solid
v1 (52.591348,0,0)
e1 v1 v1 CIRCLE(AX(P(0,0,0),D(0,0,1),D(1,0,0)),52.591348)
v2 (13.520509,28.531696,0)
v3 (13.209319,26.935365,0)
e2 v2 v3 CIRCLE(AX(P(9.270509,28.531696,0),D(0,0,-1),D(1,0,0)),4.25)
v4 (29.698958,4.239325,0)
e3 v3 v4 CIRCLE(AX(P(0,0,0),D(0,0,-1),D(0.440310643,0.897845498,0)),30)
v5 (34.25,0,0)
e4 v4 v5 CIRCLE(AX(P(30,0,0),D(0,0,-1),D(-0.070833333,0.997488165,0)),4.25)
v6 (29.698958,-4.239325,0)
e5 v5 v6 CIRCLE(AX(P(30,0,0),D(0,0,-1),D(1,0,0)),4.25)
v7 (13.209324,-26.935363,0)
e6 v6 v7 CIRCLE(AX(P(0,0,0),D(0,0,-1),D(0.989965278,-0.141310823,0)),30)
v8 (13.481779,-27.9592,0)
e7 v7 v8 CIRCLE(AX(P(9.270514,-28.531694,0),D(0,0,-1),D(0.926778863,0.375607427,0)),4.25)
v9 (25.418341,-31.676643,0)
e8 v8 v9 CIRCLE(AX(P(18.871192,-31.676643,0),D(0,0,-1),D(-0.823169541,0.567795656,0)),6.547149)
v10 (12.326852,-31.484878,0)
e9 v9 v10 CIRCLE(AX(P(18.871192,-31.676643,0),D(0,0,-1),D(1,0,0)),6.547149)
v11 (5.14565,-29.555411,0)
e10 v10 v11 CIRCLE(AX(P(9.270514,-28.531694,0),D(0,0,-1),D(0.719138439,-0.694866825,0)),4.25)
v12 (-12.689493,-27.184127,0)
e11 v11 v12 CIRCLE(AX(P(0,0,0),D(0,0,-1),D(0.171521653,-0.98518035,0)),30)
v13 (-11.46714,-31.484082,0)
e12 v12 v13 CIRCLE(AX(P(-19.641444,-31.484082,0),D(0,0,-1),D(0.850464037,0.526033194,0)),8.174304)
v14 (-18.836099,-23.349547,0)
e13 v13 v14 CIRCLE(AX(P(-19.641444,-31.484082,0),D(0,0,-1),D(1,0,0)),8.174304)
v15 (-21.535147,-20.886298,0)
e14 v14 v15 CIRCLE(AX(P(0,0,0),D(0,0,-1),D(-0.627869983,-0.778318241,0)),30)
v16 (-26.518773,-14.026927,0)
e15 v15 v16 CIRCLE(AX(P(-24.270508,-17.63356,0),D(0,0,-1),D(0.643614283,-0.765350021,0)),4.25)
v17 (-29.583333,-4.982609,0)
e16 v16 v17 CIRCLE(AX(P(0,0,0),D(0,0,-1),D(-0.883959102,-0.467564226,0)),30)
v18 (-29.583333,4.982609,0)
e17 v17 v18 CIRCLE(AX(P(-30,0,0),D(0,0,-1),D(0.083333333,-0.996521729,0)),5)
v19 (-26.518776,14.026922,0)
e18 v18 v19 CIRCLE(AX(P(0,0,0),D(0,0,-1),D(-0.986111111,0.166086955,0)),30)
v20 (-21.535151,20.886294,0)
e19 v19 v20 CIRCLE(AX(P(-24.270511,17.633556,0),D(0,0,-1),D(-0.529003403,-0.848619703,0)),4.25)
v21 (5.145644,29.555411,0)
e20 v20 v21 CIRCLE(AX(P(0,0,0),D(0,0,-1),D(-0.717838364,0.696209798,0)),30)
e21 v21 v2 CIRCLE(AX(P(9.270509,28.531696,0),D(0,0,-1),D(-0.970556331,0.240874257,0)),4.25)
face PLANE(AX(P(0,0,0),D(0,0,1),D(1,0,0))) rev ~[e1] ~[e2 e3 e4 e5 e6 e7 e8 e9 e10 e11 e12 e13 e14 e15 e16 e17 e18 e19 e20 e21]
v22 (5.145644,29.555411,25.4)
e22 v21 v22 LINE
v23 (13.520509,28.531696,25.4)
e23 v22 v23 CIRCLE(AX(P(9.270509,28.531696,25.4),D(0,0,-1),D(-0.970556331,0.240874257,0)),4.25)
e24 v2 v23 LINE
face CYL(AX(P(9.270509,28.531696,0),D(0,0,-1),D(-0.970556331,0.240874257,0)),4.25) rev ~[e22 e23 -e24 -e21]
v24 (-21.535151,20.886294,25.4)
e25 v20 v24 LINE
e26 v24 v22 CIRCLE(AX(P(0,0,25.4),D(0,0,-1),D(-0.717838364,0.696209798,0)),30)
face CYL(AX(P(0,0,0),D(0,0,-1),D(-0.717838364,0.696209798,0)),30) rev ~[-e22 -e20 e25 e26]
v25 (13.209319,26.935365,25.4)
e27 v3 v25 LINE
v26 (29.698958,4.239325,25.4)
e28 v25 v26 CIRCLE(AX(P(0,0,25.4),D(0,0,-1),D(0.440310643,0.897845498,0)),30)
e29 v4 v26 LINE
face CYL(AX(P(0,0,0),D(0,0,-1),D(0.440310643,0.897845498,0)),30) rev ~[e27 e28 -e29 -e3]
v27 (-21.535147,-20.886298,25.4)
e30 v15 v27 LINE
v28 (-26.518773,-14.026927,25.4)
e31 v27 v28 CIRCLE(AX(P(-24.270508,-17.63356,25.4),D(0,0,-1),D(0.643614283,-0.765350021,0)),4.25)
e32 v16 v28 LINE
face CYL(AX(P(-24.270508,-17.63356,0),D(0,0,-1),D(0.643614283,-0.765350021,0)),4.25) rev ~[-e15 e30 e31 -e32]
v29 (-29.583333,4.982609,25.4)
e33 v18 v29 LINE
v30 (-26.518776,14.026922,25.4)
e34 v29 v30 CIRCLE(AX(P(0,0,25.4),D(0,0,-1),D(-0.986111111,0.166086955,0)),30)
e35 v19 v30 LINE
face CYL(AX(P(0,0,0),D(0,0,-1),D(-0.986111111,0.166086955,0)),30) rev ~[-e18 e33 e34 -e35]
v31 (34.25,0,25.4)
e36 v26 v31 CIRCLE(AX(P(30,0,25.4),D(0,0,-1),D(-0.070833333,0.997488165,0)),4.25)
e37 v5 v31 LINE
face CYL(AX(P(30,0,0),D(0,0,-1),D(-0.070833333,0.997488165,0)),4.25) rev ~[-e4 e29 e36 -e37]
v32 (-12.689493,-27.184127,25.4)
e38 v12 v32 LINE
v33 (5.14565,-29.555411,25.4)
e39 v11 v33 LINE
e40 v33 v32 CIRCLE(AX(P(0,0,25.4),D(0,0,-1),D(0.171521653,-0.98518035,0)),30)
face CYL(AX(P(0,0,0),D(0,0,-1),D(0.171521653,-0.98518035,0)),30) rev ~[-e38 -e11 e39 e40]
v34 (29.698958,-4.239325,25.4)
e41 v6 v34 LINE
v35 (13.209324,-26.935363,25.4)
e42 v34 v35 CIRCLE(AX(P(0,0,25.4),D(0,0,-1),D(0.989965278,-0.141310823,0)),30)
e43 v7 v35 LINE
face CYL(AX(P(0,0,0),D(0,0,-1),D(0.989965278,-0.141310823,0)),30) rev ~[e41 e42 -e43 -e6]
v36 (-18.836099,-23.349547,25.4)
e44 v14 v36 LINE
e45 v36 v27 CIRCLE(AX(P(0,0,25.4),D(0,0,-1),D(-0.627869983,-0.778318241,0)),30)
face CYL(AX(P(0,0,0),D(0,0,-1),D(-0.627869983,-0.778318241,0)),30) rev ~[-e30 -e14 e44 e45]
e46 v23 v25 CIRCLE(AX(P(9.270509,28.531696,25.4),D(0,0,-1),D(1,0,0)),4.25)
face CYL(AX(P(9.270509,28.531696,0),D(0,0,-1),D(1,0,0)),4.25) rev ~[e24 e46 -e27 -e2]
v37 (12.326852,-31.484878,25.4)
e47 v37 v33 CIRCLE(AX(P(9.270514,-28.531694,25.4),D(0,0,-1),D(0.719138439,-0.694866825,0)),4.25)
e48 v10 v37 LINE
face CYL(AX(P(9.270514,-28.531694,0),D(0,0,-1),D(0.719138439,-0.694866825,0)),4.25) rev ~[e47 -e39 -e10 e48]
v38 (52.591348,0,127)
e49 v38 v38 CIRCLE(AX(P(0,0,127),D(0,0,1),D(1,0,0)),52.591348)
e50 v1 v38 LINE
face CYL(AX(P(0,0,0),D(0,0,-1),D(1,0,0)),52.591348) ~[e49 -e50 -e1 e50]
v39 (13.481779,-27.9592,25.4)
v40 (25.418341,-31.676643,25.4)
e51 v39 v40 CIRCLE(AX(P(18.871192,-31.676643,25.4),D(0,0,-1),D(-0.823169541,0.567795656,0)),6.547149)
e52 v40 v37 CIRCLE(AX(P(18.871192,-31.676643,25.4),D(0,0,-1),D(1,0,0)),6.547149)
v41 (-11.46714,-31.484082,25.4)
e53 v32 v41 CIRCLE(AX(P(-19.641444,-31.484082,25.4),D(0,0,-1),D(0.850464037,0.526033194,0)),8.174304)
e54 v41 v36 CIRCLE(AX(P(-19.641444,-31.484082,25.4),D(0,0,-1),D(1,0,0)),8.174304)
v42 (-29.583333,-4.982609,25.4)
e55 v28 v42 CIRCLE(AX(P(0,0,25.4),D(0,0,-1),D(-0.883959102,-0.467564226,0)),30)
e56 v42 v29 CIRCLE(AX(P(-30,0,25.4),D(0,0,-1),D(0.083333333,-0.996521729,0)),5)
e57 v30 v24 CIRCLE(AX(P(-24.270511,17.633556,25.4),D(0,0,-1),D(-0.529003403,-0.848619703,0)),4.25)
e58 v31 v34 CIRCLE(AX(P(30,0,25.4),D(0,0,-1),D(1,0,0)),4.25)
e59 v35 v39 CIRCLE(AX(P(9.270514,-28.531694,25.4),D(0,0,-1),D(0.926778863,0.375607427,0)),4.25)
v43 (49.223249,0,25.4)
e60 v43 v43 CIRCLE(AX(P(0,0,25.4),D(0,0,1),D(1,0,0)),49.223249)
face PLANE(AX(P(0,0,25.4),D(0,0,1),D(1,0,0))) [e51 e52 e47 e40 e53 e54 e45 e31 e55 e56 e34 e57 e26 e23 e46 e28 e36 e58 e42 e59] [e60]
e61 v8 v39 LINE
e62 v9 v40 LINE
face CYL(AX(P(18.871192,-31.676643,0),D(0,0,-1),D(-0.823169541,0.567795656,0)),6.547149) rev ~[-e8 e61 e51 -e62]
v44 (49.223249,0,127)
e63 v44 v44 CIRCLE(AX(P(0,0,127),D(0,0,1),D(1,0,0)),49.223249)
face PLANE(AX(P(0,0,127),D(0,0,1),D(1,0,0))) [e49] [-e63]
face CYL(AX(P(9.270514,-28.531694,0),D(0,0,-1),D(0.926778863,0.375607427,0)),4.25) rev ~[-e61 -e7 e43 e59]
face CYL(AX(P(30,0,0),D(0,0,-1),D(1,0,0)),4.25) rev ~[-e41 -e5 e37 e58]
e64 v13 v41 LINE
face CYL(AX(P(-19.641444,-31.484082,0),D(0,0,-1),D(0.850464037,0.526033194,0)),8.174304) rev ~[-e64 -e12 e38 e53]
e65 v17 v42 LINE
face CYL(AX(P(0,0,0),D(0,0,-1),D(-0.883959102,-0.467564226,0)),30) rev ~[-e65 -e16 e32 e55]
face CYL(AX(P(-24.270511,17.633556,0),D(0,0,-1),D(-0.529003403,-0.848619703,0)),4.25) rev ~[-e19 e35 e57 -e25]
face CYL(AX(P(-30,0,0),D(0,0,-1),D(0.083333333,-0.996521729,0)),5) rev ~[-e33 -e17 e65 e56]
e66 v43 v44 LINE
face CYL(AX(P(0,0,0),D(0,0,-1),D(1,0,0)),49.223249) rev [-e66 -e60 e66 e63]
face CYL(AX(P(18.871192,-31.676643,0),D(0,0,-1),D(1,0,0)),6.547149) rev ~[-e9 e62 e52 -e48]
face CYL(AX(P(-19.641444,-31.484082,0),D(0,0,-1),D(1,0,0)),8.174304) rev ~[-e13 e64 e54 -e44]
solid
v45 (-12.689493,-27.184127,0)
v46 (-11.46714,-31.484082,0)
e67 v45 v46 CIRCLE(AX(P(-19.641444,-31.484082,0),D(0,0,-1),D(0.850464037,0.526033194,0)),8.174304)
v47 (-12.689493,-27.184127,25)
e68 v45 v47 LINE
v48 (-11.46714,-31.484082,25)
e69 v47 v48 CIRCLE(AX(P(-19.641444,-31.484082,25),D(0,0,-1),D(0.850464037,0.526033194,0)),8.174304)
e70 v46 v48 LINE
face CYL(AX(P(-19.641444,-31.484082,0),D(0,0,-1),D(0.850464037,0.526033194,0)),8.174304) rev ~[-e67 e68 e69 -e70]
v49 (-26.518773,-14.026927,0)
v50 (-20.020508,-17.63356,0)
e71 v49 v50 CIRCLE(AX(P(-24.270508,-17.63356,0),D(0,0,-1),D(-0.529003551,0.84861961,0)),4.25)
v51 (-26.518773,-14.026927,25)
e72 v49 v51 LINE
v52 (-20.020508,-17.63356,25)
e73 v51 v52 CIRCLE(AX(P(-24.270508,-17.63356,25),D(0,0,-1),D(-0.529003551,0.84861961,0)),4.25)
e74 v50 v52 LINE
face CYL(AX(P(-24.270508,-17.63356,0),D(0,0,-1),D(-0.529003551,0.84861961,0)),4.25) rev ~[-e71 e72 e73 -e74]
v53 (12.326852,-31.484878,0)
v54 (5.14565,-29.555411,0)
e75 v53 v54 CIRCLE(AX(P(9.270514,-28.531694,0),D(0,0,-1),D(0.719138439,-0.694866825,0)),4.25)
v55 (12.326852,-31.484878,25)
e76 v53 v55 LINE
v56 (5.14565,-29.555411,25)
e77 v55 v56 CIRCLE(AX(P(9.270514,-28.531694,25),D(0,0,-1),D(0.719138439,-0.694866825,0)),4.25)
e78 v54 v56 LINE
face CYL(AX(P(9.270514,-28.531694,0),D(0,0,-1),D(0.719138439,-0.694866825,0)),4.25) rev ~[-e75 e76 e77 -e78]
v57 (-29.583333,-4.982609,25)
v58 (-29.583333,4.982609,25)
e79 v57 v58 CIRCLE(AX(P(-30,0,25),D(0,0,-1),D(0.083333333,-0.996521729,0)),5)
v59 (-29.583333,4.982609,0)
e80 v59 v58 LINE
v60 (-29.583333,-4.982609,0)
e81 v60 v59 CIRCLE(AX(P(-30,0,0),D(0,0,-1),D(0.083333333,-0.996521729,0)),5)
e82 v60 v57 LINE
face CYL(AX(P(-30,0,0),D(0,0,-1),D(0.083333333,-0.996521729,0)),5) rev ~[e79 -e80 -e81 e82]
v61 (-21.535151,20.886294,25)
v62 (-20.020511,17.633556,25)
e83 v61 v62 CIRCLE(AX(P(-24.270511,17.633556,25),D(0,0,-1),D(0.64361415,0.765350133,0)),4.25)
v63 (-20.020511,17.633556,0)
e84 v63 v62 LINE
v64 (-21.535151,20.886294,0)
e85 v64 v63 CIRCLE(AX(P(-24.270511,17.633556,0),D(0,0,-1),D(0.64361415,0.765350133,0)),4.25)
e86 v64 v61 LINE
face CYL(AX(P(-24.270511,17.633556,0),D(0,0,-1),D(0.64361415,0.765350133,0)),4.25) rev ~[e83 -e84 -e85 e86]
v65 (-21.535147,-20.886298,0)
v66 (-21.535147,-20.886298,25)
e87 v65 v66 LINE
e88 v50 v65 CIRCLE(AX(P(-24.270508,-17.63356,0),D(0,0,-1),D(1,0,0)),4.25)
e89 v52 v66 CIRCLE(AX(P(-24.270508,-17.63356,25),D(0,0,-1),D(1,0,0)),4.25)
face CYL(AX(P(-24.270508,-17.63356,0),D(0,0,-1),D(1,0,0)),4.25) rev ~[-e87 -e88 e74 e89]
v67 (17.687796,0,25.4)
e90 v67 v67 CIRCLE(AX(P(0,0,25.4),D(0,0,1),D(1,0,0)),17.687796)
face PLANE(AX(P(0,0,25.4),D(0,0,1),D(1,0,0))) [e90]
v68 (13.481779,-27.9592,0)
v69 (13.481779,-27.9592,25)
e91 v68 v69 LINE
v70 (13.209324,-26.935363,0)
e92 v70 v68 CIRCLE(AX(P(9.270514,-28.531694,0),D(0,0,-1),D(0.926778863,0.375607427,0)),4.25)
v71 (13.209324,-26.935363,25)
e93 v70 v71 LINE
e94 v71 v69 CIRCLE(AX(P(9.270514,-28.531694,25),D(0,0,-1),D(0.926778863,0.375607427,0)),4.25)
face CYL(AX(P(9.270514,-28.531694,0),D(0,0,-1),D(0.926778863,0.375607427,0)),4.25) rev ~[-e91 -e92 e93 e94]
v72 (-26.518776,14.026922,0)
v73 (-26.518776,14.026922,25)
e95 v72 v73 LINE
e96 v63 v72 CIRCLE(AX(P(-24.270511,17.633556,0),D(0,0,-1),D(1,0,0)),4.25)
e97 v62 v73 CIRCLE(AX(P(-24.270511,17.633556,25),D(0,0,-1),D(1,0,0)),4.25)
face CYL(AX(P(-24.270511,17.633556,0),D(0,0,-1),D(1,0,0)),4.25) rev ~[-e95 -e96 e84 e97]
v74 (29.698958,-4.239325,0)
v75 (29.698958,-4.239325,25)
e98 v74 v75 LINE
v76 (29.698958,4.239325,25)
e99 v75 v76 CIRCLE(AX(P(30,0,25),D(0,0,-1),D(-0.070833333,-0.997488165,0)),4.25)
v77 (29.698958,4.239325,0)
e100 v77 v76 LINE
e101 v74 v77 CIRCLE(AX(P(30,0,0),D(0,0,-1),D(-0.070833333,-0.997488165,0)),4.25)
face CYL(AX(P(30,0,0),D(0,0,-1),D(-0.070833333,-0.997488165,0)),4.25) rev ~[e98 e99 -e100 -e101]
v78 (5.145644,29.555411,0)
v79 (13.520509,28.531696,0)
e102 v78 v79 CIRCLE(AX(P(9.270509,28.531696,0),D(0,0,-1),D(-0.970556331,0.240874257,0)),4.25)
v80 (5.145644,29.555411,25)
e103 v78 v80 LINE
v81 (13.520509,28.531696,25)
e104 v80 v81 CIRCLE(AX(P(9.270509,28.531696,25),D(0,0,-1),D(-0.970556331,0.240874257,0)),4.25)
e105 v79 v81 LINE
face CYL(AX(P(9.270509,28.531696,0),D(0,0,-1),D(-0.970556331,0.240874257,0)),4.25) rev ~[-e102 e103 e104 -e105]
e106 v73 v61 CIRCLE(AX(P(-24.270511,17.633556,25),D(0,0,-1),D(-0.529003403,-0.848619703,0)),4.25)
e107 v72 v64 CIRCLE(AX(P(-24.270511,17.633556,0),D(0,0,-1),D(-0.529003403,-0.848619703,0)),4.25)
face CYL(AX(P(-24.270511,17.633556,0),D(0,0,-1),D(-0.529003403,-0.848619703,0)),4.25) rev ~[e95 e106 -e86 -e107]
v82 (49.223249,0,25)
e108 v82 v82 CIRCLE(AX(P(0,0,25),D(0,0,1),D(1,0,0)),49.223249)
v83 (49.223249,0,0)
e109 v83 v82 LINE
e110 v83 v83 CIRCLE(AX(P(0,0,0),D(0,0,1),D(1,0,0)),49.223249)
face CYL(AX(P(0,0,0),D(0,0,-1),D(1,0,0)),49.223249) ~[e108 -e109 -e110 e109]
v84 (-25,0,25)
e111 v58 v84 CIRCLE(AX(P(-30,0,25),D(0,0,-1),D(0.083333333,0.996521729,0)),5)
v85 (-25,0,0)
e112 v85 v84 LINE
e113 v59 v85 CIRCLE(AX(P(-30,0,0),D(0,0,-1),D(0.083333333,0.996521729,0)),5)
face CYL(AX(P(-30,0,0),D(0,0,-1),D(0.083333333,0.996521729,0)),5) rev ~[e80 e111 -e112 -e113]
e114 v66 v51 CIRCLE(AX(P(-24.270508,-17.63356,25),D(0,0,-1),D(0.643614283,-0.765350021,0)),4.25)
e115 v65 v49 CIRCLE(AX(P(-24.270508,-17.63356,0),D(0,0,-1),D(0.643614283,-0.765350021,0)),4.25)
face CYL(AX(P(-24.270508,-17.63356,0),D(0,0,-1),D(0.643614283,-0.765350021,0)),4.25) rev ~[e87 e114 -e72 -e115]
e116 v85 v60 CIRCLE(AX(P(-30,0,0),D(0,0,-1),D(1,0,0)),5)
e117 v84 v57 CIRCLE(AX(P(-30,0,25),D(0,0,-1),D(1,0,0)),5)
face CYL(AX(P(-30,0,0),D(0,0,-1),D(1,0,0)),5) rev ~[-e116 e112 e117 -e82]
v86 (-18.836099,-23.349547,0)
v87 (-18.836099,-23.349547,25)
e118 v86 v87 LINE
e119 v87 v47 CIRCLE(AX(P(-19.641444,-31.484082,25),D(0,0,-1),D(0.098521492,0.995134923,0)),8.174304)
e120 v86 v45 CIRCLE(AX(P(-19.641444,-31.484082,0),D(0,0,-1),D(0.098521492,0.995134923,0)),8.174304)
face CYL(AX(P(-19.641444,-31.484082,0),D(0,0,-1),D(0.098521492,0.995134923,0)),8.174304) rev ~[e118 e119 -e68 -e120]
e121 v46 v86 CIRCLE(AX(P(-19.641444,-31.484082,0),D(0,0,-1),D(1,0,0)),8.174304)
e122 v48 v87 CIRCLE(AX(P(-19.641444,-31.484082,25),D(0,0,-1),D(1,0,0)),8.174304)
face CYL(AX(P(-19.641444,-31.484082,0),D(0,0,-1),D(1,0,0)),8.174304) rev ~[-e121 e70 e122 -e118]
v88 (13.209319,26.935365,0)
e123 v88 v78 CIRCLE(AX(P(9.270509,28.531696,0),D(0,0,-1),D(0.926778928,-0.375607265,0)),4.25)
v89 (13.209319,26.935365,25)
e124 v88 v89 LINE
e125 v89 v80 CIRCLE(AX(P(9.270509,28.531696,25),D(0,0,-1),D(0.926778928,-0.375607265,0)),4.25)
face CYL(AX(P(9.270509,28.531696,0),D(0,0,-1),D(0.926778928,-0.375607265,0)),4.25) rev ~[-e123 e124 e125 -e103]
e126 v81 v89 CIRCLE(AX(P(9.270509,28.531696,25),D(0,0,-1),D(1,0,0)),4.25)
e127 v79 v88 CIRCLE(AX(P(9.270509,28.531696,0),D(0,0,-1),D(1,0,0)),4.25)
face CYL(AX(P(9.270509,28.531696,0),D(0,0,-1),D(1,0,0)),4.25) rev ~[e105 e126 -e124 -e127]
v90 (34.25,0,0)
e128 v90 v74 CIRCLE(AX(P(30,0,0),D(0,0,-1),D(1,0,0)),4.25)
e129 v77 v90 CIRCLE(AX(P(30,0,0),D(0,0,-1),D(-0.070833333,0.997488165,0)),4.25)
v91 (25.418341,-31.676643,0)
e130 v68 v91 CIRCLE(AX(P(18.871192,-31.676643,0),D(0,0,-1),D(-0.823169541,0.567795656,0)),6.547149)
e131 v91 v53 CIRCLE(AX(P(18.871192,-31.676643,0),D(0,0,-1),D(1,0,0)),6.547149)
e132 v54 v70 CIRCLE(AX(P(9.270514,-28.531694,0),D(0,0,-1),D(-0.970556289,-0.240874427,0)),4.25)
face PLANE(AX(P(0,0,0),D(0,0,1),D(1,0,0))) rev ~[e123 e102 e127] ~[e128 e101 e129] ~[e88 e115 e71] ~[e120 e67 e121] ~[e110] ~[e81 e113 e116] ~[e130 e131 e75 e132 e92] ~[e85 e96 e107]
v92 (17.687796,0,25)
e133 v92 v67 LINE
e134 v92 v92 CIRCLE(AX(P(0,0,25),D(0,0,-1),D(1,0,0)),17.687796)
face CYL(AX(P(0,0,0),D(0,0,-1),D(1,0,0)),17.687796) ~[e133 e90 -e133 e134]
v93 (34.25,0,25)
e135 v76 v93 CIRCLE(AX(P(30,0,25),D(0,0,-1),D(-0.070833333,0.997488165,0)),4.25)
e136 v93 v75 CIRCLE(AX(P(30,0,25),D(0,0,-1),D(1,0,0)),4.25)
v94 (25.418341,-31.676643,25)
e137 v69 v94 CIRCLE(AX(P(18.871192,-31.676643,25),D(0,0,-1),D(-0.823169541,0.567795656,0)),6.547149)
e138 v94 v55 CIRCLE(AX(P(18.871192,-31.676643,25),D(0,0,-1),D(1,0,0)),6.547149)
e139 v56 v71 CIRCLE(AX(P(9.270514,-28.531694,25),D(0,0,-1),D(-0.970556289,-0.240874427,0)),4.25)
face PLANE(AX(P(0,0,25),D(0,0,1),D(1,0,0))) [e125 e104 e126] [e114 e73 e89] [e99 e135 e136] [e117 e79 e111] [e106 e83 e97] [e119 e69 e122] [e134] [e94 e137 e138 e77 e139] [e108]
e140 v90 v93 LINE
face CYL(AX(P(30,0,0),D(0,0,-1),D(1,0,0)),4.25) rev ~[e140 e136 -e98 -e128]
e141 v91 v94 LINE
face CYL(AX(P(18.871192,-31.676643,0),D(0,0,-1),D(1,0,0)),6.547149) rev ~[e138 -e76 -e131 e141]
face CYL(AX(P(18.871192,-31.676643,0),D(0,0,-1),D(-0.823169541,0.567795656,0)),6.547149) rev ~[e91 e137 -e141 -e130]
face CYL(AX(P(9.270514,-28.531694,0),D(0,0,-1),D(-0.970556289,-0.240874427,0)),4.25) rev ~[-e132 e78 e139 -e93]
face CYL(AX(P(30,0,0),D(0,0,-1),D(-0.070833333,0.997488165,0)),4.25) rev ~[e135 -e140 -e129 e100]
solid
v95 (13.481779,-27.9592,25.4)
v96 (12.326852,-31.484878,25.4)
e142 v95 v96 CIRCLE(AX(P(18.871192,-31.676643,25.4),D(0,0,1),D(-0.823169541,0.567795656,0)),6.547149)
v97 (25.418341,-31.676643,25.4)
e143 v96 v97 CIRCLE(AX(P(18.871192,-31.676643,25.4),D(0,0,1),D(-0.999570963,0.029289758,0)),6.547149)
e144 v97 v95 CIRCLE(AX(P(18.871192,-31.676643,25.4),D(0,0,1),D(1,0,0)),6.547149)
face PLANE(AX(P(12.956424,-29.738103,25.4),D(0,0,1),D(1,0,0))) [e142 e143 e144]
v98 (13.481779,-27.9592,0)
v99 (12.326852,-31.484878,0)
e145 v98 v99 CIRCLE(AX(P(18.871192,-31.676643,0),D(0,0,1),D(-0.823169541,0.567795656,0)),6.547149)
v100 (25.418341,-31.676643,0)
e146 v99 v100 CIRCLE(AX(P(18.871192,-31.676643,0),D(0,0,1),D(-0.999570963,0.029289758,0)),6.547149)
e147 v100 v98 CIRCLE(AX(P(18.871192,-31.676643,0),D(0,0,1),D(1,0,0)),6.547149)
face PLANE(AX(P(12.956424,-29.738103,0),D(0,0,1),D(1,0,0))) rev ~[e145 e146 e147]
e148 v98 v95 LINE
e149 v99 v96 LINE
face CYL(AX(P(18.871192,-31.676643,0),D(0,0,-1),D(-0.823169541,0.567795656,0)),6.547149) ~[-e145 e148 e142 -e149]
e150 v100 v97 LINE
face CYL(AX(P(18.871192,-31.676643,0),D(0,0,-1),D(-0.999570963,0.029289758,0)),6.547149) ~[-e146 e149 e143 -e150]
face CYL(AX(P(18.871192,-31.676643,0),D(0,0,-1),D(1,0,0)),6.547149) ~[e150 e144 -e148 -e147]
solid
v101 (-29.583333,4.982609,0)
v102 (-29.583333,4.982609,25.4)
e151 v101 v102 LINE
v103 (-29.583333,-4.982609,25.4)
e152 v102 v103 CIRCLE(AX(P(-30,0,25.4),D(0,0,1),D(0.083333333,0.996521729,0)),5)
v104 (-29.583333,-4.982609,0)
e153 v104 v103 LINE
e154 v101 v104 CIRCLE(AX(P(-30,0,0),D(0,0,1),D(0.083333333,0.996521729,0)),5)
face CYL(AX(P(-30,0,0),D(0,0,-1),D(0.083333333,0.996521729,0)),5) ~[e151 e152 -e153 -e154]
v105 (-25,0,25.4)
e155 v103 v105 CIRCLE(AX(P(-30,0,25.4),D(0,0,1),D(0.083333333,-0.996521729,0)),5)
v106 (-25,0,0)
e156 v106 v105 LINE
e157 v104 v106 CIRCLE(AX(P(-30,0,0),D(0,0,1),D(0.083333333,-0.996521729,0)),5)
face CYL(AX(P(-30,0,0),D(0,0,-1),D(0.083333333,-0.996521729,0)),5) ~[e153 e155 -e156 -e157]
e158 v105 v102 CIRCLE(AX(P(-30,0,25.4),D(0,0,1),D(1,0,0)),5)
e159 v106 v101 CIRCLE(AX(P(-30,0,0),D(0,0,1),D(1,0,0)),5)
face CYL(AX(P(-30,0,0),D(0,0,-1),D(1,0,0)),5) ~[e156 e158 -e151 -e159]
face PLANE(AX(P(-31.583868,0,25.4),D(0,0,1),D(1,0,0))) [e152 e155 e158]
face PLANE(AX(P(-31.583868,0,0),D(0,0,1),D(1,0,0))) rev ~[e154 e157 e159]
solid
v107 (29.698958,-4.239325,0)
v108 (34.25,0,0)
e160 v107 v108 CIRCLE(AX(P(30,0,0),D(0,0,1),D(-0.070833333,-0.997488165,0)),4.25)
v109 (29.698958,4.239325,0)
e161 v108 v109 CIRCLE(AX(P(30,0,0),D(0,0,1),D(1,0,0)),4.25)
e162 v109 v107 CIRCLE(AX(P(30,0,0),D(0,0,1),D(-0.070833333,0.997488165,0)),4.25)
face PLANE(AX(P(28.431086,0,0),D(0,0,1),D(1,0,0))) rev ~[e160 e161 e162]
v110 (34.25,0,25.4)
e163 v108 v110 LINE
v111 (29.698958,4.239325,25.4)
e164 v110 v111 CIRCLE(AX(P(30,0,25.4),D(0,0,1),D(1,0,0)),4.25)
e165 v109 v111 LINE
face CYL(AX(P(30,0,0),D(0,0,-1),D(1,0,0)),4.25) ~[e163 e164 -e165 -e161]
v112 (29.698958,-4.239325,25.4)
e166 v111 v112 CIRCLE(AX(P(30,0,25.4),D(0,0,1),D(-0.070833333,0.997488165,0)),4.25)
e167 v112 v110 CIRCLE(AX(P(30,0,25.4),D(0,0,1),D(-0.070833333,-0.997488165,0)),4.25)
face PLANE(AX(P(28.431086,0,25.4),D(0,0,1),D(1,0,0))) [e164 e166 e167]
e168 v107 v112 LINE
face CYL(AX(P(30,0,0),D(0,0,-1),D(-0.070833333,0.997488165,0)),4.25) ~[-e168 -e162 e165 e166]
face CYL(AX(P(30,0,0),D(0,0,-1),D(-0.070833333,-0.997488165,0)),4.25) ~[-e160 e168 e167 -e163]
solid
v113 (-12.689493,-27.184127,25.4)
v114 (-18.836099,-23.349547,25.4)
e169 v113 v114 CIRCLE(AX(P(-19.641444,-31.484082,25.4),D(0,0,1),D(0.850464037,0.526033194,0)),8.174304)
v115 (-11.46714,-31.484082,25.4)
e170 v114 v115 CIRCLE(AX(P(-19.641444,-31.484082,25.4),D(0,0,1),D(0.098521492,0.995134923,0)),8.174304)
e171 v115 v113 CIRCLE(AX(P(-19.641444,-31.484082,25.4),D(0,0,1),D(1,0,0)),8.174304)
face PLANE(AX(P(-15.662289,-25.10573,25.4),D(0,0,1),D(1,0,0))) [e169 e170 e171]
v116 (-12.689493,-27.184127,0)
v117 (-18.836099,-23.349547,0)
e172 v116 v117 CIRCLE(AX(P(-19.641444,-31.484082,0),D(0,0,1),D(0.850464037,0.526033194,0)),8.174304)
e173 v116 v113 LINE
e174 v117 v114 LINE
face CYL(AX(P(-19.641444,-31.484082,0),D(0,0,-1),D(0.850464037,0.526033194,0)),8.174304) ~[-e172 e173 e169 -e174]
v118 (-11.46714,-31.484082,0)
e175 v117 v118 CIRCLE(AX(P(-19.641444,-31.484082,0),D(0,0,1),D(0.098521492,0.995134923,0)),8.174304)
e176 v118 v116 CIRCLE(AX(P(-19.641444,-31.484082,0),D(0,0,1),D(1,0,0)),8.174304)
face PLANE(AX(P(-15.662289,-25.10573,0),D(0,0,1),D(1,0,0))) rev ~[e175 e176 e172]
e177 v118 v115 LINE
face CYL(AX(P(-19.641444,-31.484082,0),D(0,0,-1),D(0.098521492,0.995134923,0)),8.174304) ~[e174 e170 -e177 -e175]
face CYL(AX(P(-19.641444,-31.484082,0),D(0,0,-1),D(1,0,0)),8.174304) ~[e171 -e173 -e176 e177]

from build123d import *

# Parameters (mm, degrees)
F3_DEPTH = 25.4
F0_R     = 49.2232486947
F6_DEPTH = 25.4
F1_R     = 17.687795716
F0_R_2   = 52.5913484354
F7_DEPTH = 127
F9_DEPTH = 25


# Not quite as in the source:
# - a feature names something its author has since deleted; it is built from what else it names


with BuildPart() as f3:
    # F0 (on Top) → F3 (new body)
    with BuildSketch(Plane.XY):
        with BuildLine():
            ThreePointArc((-29.5833333333, -4.982608643), (-30, 0), (-29.5833333333, 4.982608643))
            ThreePointArc((-29.5833333333, 4.982608643), (-35, 0), (-29.5833333333, -4.982608643))
        make_face()
        with BuildLine():
            ThreePointArc((-25, 0), (-26.320099639, 3.3850160019), (-29.5833333333, 4.982608643))
            ThreePointArc((-29.5833333333, 4.982608643), (-30, 0), (-29.5833333333, -4.982608643))
            ThreePointArc((-29.5833333333, -4.982608643), (-26.320099639, -3.3850160019), (-25, 0))
        make_face()
    extrude(amount=F3_DEPTH)


with BuildPart() as f3b:
    # F0 (on Top) → F3, piece 2 (new body)
    with BuildSketch(Plane.XY):
        with BuildLine():
            ThreePointArc((-18.8360994911, -23.3495472325), (-15.8789717039, -25.4530598873), (-12.6894927419, -27.1841272428))
            ThreePointArc((-12.6894927419, -27.1841272428), (-15.3147928366, -24.5487142681), (-18.8360994911, -23.3495472325))
        make_face()
        with BuildLine():
            ThreePointArc((-11.4671403642, -31.4840823412), (-11.7786645812, -29.2489224373), (-12.6894927419, -27.1841272428))
            ThreePointArc((-12.6894927419, -27.1841272428), (-15.8789717039, -25.4530598873), (-18.8360994911, -23.3495472325))
            ThreePointArc((-18.8360994911, -23.3495472325), (-25.699594493, -36.9720742337), (-11.4671403642, -31.4840823412))
        make_face()
    extrude(amount=F3_DEPTH)


with BuildPart() as f3c:
    # F0 (on Top) → F3, piece 3 (new body)
    with BuildSketch(Plane.XY):
        with BuildLine():
            ThreePointArc((13.5205138222, -28.5316941921), (13.5108189409, -28.2447926413), (13.4817785281, -27.9592000205))
            ThreePointArc((13.4817785281, -27.9592000205), (12.6493579809, -29.63852128), (12.3268521898, -31.4848781997))
            ThreePointArc((12.3268521898, -31.4848781997), (13.2108144492, -30.1243432334), (13.5205138222, -28.5316941921))
        make_face()
        with BuildLine():
            ThreePointArc((25.4183405572, -31.6766425967), (20.8179668086, -25.4256248319), (13.4817785281, -27.9592000205))
            ThreePointArc((13.4817785281, -27.9592000205), (13.5108189409, -28.2447926413), (13.5205138222, -28.5316941921))
            ThreePointArc((13.5205138222, -28.5316941921), (13.2108144492, -30.1243432334), (12.3268521898, -31.4848781997))
            ThreePointArc((12.3268521898, -31.4848781997), (18.7752994046, -38.223088985), (25.4183405572, -31.6766425967))
        make_face()
    extrude(amount=F3_DEPTH)


with BuildPart() as f3d:
    # F0 (on Top) → F3, piece 4 (new body)
    with BuildSketch(Plane.XY):
        with BuildLine():
            ThreePointArc((30, 0), (29.9246449436, 2.125), (29.6989583333, 4.2393247003))
            ThreePointArc((29.6989583333, 4.2393247003), (25.75, 0), (29.6989583333, -4.2393247003))
            ThreePointArc((29.6989583333, -4.2393247003), (29.9246449436, -2.125), (30, 0))
        make_face()
        with BuildLine():
            ThreePointArc((29.6989583333, -4.2393247003), (32.8968148816, -3.1098172843), (34.25, 0))
            ThreePointArc((34.25, 0), (32.8968148816, 3.1098172843), (29.6989583333, 4.2393247003))
            ThreePointArc((29.6989583333, 4.2393247003), (29.9246449436, 2.125), (30, 0))
            ThreePointArc((30, 0), (29.9246449436, -2.125), (29.6989583333, -4.2393247003))
        make_face()
    extrude(amount=F3_DEPTH)


with BuildPart() as f6:
    # F0 (on Top) → F6 (new body)
    with BuildSketch(Plane.XY):
        Circle(F0_R)
        with BuildLine():
            ThreePointArc((29.6989583333, 4.2393247003), (32.8968148816, 3.1098172843), (34.25, 0))
            ThreePointArc((34.25, 0), (32.8968148816, -3.1098172843), (29.6989583333, -4.2393247003))
            ThreePointArc((29.6989583333, -4.2393247003), (24.2705110645, -17.6335558713), (13.2093239888, -26.9353626253))
            ThreePointArc((13.2093239888, -26.9353626253), (13.3775797895, -27.4387581739), (13.4817785281, -27.9592000205))
            ThreePointArc((13.4817785281, -27.9592000205), (20.8179668086, -25.4256248319), (25.4183405572, -31.6766425967))
            ThreePointArc((25.4183405572, -31.6766425967), (18.7752994046, -38.223088985), (12.3268521898, -31.4848781997))
            ThreePointArc((12.3268521898, -31.4848781997), (8.1677226938, -32.6361249355), (5.1456495934, -29.5554105074))
            ThreePointArc((5.1456495934, -29.5554105074), (-3.9538763818, -29.7383062994), (-12.6894927419, -27.1841272428))
            ThreePointArc((-12.6894927419, -27.1841272428), (-11.7786645812, -29.2489224373), (-11.4671403642, -31.4840823412))
            ThreePointArc((-11.4671403642, -31.4840823412), (-25.699594493, -36.9720742337), (-18.8360994911, -23.3495472325))
            ThreePointArc((-18.8360994911, -23.3495472325), (-20.2231622396, -22.1590547865), (-21.5351472772, -20.8862977032))
            ThreePointArc((-21.5351472772, -20.8862977032), (-27.7088299454, -20.1316477979), (-26.5187730739, -14.0269267715))
            ThreePointArc((-26.5187730739, -14.0269267715), (-28.4132277018, -9.6274862537), (-29.5833333333, -4.982608643))
            ThreePointArc((-29.5833333333, -4.982608643), (-35, 0), (-29.5833333333, 4.982608643))
            ThreePointArc((-29.5833333333, 4.982608643), (-28.4132285435, 9.6274837697), (-26.5187755265, 14.0269221349))
            ThreePointArc((-26.5187755265, 14.0269221349), (-27.7088334653, 20.1316429531), (-21.5351509291, 20.8862939379))
            ThreePointArc((-21.5351509291, 20.8862939379), (-9.2705113278, 28.5316950026), (5.1456444258, 29.5554114071))
            ThreePointArc((5.1456444258, 29.5554114071), (9.7861764915, 32.7502959205), (13.5205088335, 28.531695813))
            ThreePointArc((13.5205088335, 28.531695813), (13.4419860536, 27.7185059196), (13.2093192793, 26.9353649349))
            ThreePointArc((13.2093192793, 26.9353649349), (24.2705095229, 17.6335579931), (29.6989583333, 4.2393247003))
        make_face(mode=Mode.SUBTRACT)
    extrude(amount=F6_DEPTH)

    # F0 (on Top) → F7 (join)
    with BuildSketch(Plane.XY):
        Circle(F0_R_2)
        Circle(F0_R, mode=Mode.SUBTRACT)
    extrude(amount=F7_DEPTH)


with BuildPart() as f6b:
    # F1 (on Top) → F6, piece 2 (new body)
    with BuildSketch(Plane.XY):
        Circle(F1_R)
    extrude(amount=F6_DEPTH)

    # F0 (on Top) → F9 (join)
    with BuildSketch(Plane.XY):
        Circle(F0_R)
        with BuildLine():
            ThreePointArc((29.6989583333, 4.2393247003), (32.8968148816, 3.1098172843), (34.25, 0))
            ThreePointArc((34.25, 0), (32.8968148816, -3.1098172843), (29.6989583333, -4.2393247003))
            ThreePointArc((29.6989583333, -4.2393247003), (24.2705110645, -17.6335558713), (13.2093239888, -26.9353626253))
            ThreePointArc((13.2093239888, -26.9353626253), (13.3775797895, -27.4387581739), (13.4817785281, -27.9592000205))
            ThreePointArc((13.4817785281, -27.9592000205), (20.8179668086, -25.4256248319), (25.4183405572, -31.6766425967))
            ThreePointArc((25.4183405572, -31.6766425967), (18.7752994046, -38.223088985), (12.3268521898, -31.4848781997))
            ThreePointArc((12.3268521898, -31.4848781997), (8.1677226938, -32.6361249355), (5.1456495934, -29.5554105074))
            ThreePointArc((5.1456495934, -29.5554105074), (-3.9538763818, -29.7383062994), (-12.6894927419, -27.1841272428))
            ThreePointArc((-12.6894927419, -27.1841272428), (-11.7786645812, -29.2489224373), (-11.4671403642, -31.4840823412))
            ThreePointArc((-11.4671403642, -31.4840823412), (-25.699594493, -36.9720742337), (-18.8360994911, -23.3495472325))
            ThreePointArc((-18.8360994911, -23.3495472325), (-20.2231622396, -22.1590547865), (-21.5351472772, -20.8862977032))
            ThreePointArc((-21.5351472772, -20.8862977032), (-27.7088299454, -20.1316477979), (-26.5187730739, -14.0269267715))
            ThreePointArc((-26.5187730739, -14.0269267715), (-28.4132277018, -9.6274862537), (-29.5833333333, -4.982608643))
            ThreePointArc((-29.5833333333, -4.982608643), (-35, 0), (-29.5833333333, 4.982608643))
            ThreePointArc((-29.5833333333, 4.982608643), (-28.4132285435, 9.6274837697), (-26.5187755265, 14.0269221349))
            ThreePointArc((-26.5187755265, 14.0269221349), (-27.7088334653, 20.1316429531), (-21.5351509291, 20.8862939379))
            ThreePointArc((-21.5351509291, 20.8862939379), (-9.2705113278, 28.5316950026), (5.1456444258, 29.5554114071))
            ThreePointArc((5.1456444258, 29.5554114071), (9.7861764915, 32.7502959205), (13.5205088335, 28.531695813))
            ThreePointArc((13.5205088335, 28.531695813), (13.4419860536, 27.7185059196), (13.2093192793, 26.9353649349))
            ThreePointArc((13.2093192793, 26.9353649349), (24.2705095229, 17.6335579931), (29.6989583333, 4.2393247003))
        make_face(mode=Mode.SUBTRACT)
        with BuildLine():
            ThreePointArc((29.6989583333, -4.2393247003), (25.75, 0), (29.6989583333, 4.2393247003))
            ThreePointArc((29.6989583333, 4.2393247003), (24.2705095229, 17.6335579931), (13.2093192793, 26.9353649349))
            ThreePointArc((13.2093192793, 26.9353649349), (7.9571867488, 24.4897055729), (5.1456444258, 29.5554114071))
            ThreePointArc((5.1456444258, 29.5554114071), (-9.2705113278, 28.5316950026), (-21.5351509291, 20.8862939379))
            ThreePointArc((-21.5351509291, 20.8862939379), (-20.4177341066, 19.4276042855), (-20.0205110645, 17.6335558713))
            ThreePointArc((-20.0205110645, 17.6335558713), (-22.2080639698, 13.9175348836), (-26.5187755265, 14.0269221349))
            ThreePointArc((-26.5187755265, 14.0269221349), (-28.4132285435, 9.6274837697), (-29.5833333333, 4.982608643))
            ThreePointArc((-29.5833333333, 4.982608643), (-26.320099639, 3.3850160019), (-25, 0))
            ThreePointArc((-25, 0), (-26.320099639, -3.3850160019), (-29.5833333333, -4.982608643))
            ThreePointArc((-29.5833333333, -4.982608643), (-28.4132277018, -9.6274862537), (-26.5187730739, -14.0269267715))
            ThreePointArc((-26.5187730739, -14.0269267715), (-22.2080612115, -13.9175389468), (-20.0205079814, -17.6335601149))
            ThreePointArc((-20.0205079814, -17.6335601149), (-20.4177308666, -19.4276081922), (-21.5351472772, -20.8862977032))
            ThreePointArc((-21.5351472772, -20.8862977032), (-20.2231622396, -22.1590547865), (-18.8360994911, -23.3495472325))
            ThreePointArc((-18.8360994911, -23.3495472325), (-15.3147928366, -24.5487142681), (-12.6894927419, -27.1841272428))
            ThreePointArc((-12.6894927419, -27.1841272428), (-3.9538763818, -29.7383062994), (5.1456495934, -29.5554105074))
            ThreePointArc((5.1456495934, -29.5554105074), (7.9571910307, -24.4897041816), (13.2093239888, -26.9353626253))
            ThreePointArc((13.2093239888, -26.9353626253), (24.2705110645, -17.6335558713), (29.6989583333, -4.2393247003))
        make_face()
    extrude(amount=F9_DEPTH)


solid = Compound([f3.part, f3b.part, f3c.part, f3d.part, f6.part, f6b.part])
